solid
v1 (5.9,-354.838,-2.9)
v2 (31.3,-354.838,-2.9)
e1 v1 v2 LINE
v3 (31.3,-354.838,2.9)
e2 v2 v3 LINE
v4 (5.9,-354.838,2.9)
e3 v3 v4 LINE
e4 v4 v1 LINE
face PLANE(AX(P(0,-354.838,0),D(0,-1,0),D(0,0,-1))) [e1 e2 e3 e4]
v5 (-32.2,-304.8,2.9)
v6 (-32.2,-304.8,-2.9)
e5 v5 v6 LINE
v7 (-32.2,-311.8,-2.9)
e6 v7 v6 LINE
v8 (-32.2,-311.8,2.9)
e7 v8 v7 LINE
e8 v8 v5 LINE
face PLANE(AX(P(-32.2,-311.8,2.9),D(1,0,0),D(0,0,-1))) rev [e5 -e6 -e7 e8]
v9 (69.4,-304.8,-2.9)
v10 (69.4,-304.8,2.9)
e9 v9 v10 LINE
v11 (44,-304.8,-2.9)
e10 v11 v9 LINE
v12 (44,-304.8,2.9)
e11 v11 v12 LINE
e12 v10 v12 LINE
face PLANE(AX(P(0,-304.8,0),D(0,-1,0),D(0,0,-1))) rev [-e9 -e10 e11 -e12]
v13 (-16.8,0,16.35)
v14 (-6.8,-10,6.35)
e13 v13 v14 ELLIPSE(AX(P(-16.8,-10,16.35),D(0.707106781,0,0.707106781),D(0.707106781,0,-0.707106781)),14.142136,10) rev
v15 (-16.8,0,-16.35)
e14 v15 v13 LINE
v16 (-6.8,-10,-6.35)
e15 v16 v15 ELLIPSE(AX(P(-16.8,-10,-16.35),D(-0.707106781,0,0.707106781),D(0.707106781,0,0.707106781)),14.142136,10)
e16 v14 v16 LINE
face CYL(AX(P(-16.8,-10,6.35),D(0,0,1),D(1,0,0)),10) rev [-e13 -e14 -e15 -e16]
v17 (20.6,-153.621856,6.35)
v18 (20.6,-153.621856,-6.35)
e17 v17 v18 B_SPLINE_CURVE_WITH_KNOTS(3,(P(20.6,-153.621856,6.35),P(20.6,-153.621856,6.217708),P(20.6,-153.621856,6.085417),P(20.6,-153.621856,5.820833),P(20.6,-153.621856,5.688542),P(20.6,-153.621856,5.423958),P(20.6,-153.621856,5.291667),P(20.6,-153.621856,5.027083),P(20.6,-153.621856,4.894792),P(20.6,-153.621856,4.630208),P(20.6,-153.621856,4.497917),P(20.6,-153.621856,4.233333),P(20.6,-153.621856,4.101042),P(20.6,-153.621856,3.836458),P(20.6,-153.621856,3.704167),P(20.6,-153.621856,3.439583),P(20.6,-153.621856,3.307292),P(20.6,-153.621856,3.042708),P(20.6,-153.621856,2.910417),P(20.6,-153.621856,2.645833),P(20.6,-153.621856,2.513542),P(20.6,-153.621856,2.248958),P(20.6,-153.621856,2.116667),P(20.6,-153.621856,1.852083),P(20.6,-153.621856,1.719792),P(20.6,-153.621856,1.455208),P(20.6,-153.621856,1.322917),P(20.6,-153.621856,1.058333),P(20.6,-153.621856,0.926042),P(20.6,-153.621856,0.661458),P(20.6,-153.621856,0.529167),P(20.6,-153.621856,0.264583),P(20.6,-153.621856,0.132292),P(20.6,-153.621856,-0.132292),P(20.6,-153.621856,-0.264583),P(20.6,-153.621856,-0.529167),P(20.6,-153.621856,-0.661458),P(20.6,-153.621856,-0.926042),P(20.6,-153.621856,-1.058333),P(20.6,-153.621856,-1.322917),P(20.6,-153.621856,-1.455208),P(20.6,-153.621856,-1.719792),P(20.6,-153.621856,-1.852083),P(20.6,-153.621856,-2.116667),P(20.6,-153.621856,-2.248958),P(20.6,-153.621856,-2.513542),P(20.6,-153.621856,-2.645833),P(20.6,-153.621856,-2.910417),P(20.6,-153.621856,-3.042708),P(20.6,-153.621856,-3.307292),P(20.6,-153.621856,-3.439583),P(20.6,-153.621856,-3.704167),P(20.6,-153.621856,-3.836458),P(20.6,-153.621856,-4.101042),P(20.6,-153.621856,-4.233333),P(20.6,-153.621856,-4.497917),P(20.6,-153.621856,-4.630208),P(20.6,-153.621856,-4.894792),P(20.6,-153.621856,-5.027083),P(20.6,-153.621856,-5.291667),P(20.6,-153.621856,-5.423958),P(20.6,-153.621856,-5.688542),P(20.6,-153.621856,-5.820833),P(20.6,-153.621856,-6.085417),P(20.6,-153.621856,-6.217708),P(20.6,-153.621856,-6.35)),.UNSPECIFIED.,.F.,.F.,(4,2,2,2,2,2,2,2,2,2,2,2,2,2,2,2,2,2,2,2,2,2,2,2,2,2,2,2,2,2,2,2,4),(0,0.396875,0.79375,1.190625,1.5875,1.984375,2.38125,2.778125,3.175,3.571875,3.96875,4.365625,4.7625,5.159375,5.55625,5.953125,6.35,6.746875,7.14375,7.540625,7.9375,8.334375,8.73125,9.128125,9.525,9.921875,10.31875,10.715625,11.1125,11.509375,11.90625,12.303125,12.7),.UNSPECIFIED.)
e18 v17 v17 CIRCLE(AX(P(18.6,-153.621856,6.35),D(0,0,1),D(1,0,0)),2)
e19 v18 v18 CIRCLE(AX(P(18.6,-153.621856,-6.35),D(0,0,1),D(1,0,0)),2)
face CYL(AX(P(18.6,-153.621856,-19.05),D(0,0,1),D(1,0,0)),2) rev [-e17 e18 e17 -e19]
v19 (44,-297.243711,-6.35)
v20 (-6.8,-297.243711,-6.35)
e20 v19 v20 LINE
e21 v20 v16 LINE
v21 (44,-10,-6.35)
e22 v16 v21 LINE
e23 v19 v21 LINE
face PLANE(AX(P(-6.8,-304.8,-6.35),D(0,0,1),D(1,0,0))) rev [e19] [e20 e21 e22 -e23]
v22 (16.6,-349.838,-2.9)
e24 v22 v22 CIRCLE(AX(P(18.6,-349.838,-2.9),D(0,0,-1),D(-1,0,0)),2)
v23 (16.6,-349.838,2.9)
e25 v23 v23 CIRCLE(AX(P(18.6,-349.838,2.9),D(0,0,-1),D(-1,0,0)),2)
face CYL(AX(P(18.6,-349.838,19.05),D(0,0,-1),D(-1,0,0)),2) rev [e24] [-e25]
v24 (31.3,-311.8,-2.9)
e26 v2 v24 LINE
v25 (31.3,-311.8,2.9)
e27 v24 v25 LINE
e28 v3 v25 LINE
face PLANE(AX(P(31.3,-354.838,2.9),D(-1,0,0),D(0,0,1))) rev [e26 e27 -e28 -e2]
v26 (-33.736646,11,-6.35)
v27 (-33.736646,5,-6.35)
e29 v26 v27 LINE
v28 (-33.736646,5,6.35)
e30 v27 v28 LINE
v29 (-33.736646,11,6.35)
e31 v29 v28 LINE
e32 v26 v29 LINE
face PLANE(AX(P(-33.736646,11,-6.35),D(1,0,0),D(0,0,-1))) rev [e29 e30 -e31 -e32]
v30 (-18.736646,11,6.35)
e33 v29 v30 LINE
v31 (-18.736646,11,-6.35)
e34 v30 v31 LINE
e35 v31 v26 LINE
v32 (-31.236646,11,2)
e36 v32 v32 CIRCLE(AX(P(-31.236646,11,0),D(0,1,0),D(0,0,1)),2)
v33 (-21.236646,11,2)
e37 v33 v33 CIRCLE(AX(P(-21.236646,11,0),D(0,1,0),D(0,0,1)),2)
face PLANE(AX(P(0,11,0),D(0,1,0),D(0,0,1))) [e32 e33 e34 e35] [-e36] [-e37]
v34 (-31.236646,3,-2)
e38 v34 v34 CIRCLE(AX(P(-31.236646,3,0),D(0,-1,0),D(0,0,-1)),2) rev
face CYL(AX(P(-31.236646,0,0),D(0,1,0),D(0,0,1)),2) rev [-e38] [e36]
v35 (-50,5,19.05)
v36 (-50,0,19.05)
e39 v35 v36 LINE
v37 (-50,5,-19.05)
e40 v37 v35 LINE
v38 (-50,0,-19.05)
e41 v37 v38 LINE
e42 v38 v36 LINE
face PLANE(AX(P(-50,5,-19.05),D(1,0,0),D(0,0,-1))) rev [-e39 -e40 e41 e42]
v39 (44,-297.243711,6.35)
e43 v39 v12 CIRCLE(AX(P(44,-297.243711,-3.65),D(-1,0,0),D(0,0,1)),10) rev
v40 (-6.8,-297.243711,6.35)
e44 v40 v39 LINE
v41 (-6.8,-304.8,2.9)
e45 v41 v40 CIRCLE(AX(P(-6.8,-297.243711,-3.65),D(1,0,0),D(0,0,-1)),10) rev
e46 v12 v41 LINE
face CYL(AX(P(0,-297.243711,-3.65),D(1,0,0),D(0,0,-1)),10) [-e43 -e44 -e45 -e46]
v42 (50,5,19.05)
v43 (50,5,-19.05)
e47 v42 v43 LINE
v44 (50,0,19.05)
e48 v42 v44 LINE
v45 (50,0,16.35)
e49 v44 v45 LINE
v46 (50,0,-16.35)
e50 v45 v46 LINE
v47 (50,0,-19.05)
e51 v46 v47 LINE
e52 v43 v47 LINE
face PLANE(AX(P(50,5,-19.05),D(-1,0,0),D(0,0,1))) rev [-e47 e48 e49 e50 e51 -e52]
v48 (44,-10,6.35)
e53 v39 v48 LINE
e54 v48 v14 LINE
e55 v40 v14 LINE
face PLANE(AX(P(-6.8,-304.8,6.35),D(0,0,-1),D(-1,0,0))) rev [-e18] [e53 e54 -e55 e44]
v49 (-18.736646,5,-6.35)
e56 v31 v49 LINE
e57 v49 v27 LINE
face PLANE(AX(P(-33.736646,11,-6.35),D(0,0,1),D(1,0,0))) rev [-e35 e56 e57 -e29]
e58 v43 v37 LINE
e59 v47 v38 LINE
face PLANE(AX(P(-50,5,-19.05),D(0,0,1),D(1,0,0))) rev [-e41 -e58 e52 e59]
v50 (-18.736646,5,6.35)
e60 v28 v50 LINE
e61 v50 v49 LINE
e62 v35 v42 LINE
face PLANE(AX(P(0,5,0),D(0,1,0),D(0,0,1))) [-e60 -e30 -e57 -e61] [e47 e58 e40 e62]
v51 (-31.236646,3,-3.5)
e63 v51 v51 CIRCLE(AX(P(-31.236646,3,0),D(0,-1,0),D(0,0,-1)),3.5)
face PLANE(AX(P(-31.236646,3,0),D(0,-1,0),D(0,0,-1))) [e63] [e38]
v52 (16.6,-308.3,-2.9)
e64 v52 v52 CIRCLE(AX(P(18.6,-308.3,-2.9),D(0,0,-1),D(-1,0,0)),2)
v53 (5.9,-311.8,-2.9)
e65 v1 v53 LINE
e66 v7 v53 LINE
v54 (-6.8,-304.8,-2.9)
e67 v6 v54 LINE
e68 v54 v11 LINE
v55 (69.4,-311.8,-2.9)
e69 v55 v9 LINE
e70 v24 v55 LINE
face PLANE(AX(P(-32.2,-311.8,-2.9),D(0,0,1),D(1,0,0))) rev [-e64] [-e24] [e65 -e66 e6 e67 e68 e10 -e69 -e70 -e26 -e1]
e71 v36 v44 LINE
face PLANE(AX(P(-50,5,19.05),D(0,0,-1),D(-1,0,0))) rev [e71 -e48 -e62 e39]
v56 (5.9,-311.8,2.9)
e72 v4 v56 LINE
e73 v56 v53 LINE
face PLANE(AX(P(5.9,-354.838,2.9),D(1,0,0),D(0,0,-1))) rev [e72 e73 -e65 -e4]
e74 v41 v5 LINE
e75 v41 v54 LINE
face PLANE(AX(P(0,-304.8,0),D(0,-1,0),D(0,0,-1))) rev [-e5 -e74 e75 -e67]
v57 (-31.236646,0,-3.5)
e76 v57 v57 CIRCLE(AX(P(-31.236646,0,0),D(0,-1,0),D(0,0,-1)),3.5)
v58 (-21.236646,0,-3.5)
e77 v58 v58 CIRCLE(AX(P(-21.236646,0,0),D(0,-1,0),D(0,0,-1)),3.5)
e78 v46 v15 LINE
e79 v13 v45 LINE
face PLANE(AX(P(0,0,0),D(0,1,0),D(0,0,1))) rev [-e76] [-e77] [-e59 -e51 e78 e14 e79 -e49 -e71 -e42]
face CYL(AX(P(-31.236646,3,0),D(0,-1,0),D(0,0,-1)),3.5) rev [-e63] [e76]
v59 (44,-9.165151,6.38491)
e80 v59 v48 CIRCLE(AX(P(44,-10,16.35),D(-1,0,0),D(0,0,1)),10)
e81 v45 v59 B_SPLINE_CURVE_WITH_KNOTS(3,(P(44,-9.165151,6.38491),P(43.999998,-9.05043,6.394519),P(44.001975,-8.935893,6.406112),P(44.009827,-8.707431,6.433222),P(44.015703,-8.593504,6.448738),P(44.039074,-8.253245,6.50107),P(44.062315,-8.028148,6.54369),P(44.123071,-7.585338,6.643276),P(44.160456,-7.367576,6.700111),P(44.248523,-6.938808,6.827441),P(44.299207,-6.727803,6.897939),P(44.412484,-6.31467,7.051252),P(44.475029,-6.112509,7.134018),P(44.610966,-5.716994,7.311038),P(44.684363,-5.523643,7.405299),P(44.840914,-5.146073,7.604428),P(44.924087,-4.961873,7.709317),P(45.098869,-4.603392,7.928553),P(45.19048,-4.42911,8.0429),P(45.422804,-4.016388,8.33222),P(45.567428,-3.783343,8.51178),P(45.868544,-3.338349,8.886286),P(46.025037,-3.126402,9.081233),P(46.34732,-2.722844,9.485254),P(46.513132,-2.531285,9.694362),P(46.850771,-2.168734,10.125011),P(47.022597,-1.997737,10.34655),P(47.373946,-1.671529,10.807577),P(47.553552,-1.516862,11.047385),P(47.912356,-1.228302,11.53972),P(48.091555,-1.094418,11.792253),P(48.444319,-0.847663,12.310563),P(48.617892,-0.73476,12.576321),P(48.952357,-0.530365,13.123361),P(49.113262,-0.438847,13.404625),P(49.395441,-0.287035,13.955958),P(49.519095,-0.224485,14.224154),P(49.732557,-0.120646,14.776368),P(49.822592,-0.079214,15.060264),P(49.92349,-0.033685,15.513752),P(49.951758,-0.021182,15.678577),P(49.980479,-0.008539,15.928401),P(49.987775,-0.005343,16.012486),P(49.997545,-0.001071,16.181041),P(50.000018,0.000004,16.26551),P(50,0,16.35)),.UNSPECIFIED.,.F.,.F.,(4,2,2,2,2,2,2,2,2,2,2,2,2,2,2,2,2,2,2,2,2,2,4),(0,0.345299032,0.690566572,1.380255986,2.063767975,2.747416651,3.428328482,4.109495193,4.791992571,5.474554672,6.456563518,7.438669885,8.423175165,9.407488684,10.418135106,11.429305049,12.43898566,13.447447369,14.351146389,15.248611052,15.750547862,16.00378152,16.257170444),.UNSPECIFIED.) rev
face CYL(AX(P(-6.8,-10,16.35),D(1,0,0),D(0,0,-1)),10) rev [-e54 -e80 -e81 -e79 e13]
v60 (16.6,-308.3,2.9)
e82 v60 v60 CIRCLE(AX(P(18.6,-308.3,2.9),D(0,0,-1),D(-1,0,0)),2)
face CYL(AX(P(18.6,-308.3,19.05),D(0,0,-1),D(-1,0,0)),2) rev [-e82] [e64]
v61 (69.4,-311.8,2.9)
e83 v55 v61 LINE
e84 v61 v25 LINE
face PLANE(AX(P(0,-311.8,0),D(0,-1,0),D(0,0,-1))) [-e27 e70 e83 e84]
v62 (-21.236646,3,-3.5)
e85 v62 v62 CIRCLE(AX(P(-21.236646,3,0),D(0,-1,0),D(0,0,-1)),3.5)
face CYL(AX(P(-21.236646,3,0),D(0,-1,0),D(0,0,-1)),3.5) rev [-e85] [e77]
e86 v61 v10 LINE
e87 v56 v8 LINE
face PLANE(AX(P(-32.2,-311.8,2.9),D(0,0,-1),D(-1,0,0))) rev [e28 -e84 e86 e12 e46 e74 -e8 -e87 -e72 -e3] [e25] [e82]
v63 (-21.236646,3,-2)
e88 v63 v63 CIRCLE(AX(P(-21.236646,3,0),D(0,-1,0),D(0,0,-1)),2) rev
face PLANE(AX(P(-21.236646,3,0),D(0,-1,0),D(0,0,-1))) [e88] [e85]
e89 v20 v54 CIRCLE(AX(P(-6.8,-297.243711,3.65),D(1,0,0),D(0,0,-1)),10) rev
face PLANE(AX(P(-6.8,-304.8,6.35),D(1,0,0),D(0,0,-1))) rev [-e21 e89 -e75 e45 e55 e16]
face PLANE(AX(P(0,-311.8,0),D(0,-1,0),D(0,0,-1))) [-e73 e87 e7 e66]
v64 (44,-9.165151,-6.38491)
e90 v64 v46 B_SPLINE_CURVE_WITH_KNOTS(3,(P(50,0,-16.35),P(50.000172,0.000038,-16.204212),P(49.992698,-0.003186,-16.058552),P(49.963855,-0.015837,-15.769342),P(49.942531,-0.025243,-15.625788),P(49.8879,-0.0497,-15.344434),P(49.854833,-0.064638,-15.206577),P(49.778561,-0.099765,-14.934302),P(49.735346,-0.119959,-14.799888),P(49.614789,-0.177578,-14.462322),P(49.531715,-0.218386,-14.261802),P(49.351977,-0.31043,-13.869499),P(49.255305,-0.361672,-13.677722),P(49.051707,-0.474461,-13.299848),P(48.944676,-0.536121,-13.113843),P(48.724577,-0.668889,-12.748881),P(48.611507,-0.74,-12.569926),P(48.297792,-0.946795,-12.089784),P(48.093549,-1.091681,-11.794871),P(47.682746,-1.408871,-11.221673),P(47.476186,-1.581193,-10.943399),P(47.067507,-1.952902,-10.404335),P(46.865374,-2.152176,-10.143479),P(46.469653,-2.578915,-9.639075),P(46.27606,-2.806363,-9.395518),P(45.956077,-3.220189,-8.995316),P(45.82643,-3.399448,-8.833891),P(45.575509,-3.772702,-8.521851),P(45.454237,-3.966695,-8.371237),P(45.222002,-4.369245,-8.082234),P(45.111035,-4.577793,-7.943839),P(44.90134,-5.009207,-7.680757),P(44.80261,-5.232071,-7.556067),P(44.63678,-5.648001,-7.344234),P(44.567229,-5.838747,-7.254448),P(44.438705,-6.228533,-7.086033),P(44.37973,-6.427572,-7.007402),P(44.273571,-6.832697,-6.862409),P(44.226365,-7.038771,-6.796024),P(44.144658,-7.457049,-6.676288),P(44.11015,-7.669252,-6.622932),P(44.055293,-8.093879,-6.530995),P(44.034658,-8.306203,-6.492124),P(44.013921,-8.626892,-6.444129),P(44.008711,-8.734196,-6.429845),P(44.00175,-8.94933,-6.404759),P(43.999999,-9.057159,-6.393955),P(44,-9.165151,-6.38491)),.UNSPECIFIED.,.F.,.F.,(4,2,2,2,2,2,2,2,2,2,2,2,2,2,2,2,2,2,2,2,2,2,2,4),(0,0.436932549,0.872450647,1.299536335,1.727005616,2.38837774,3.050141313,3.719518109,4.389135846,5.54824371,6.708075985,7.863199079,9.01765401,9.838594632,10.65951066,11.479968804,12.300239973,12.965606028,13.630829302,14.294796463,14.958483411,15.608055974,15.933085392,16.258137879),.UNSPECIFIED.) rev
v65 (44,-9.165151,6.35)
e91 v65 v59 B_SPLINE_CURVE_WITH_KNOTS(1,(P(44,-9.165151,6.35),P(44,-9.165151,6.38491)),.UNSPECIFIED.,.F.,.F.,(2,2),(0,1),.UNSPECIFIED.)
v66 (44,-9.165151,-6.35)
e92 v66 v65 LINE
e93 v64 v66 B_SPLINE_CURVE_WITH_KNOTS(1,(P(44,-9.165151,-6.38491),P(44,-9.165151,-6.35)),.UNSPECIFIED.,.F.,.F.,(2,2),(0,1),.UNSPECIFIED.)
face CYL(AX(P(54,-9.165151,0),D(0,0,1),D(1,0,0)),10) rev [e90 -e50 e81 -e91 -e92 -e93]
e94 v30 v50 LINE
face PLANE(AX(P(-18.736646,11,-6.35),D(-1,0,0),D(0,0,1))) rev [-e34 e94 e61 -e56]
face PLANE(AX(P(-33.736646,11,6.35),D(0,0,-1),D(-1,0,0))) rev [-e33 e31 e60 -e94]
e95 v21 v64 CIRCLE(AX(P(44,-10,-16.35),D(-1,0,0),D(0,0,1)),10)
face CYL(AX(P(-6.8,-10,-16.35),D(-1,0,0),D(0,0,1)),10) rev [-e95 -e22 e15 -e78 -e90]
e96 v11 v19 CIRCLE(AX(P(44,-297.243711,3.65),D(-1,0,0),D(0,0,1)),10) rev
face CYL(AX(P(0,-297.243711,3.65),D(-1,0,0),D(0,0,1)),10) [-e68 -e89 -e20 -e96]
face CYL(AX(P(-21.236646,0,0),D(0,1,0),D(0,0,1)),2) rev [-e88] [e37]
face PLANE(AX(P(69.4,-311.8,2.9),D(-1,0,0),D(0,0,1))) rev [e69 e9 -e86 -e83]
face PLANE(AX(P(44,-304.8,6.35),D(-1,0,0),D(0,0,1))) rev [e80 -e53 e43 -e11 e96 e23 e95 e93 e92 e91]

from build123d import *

# Parameters (mm, degrees)
BOSS_EXTRUDE1_DEPTH         = 5
BOSS_EXTRUDE2_DEPTH         = 6
TAP_DRILL_FOR_M4X0_7_TAP1_D = 3.3
SKETCH3_R                   = 2.000000000000003
CUT_EXTRUDE1_DEPTH          = 55.62510869554404
SKETCH12_R                  = 3.5
CUT_EXTRUDE2_DEPTH          = 3
BOSS_EXTRUDE3_DEPTH         = 304.8
SKETCH14_W                  = 101.6
SKETCH14_H                  = 5.799999999999999
BOSS_EXTRUDE4_DEPTH         = 7
FILLET1_R                   = 10
FILLET2_R                   = 10
FILLET3_R                   = 10
SKETCH15_R                  = 2.0000000000000036
CUT_EXTRUDE3_DEPTH          = 321.1833888570736
SKETCH16_W                  = 25.400000000000002
SKETCH16_H                  = 5.799999999999999
BOSS_EXTRUDE5_DEPTH         = 43.038
SKETCH17_R                  = 2.0000000000000036
CUT_EXTRUDE4_DEPTH          = 363.22668143581035
SKETCH18_R                  = 2.0000000000000036
CUT_EXTRUDE5_DEPTH          = 363.4521019996987


with BuildPart() as part:
    # Sketch1 → Boss-Extrude1 (new body)
    with BuildSketch(Plane(origin=(0, 0, 0), x_dir=(1, 0, 0), z_dir=(0, 1, 0))):
        Polygon((-49.99999999999999, 19.050000000000004), (50.00000000000001, 19.050000000000004), (50.000000000000014, -19.049999999999997), (-49.99999999999999, -19.049999999999997), align=None)
    extrude(amount=BOSS_EXTRUDE1_DEPTH)

    # Sketch2 → Boss-Extrude2 (add)
    with BuildSketch(Plane(origin=(0, 5, 0), x_dir=(1, 0, 0), z_dir=(0, 1, 0))):
        Polygon((-33.73664574389268, 6.349999999999993), (-18.736645743892684, 6.349999999999995), (-18.73664574389268, -6.350000000000003), (-33.73664574389268, -6.350000000000006), align=None)
    extrude(amount=BOSS_EXTRUDE2_DEPTH)

    # Tap Drill for M4x0.7 Tap1 (through all)
    with Locations(Plane(origin=(0, 11, 0), x_dir=(1, 0, 0), z_dir=(0, 1, 0))):
        with Locations((-31.236645744, 0), (-21.236645744, 0)):
            Hole(TAP_DRILL_FOR_M4X0_7_TAP1_D / 2)

    # Sketch3 → Cut-Extrude1 (cut, through all)
    with BuildSketch(Plane(origin=(0, 11, 0), x_dir=(1, 0, 0), z_dir=(0, 1, 0))):
        with Locations(Location((-21.236645743892684, 0, 0), (0, 0, 270))):
            Circle(SKETCH3_R)
        with Locations(Location((-31.23664574389268, 0, 0), (0, 0, 270))):
            Circle(SKETCH3_R)
    extrude(amount=-CUT_EXTRUDE1_DEPTH, mode=Mode.SUBTRACT)

    # Sketch12 → Cut-Extrude2 (cut)
    with BuildSketch(Plane.XZ):
        with Locations(Location((-31.23664574389268, 0, 0), (0, 0, 270))):
            Circle(SKETCH12_R)
        with Locations(Location((-21.236645743892684, 0, 0), (0, 0, 270))):
            Circle(SKETCH12_R)
    extrude(amount=-CUT_EXTRUDE2_DEPTH, mode=Mode.SUBTRACT)

    # Sketch13 → Boss-Extrude3 (add)
    with BuildSketch(Plane.XZ):
        Polygon((-6.799999999999993, 6.349999999999998), (44.00000000000001, 6.349999999999998), (44.00000000000001, -6.350000000000001), (-6.799999999999991, -6.350000000000001), align=None)
    extrude(amount=BOSS_EXTRUDE3_DEPTH)

    # Sketch14 → Boss-Extrude4 (add)
    with BuildSketch(Plane.XZ.offset(304.8)):
        with Locations((18.600000000000005, 2.89e-15)):
            Rectangle(SKETCH14_W, SKETCH14_H)
    extrude(amount=BOSS_EXTRUDE4_DEPTH)

    # Fillet1
    # the kernel refuses this fillet: 10 mm, written as the material it takes off along each edge
    with BuildSketch(Plane(origin=(62.89072192903172, -304.8, -6.350000000000001), x_dir=(0, 1, 0), z_dir=(-1, 0, 0))) as fillet1_piece_1:
        with BuildLine():
            CenterArc((7.556288771612685, -10), FILLET1_R, 90, 49.08035004511348)
            Line((0, -3.450000000000001), (-0.1511257754322628, -3.3190000000000013))
            ThreePointArc((-0.1511257754322628, -3.3190000000000013), (-0.19999999999998863, -1.7250000000000005), (-0.19999999999998863, 0))
            Line((-0.19999999999998863, 0), (0, 0.20000000000000018))
            Line((0, 0.20000000000000018), (7.556288771612685, 0.20000000000000018))
            Line((7.556288771612685, 0.20000000000000018), (7.556288771612685, 0))
        make_face()
    extrude(amount=88.58144385806342, mode=Mode.SUBTRACT)

    # Fillet2
    # the kernel refuses this fillet: 10 mm, written as the material it takes off along each edge
    with BuildSketch(Plane(origin=(-25.690721929031707, -304.8, 6.349999999999998), x_dir=(0, 1, 0), z_dir=(1, 0, 0))) as fillet2_piece_1:
        with BuildLine():
            CenterArc((7.556288771612685, -10), FILLET2_R, 90, 49.08035004511345)
            Line((0, -3.4499999999999957), (-0.1511257754322628, -3.3189999999999955))
            ThreePointArc((-0.1511257754322628, -3.3189999999999955), (-0.19999999999998863, -1.7249999999999979), (-0.19999999999998863, 0))
            Line((-0.19999999999998863, 0), (0, 0.20000000000000018))
            Line((0, 0.20000000000000018), (7.556288771612685, 0.20000000000000018))
            Line((7.556288771612685, 0.20000000000000018), (7.556288771612685, 0))
        make_face()
    extrude(amount=88.58144385806342, mode=Mode.SUBTRACT)

    # Fillet3
    # the kernel refuses this fillet: 10 mm, written as the material it adds along each edge
    with BuildSketch(Plane(origin=(44.00000000000001, 0, 6.349999999999998), x_dir=(1, 0, 0), z_dir=(0, 0, -1))) as fillet3_piece_1:
        with BuildLine():
            CenterArc((10, 9.165151389911683), FILLET3_R, 180, 66.42182152179822)
            Line((0, 9.165151389911683), (-0.20000000000000284, 9.165151389911683))
            Line((-0.20000000000000284, 9.165151389911683), (-0.20000000000000284, 0))
            Line((-0.20000000000000284, 0), (0, -0.2))
            ThreePointArc((0, -0.2), (3.000000000000007, -0.2), (5.920000000000009, -0.18330302779823368))
            Line((5.920000000000009, -0.18330302779823368), (6.000000000000007, 0))
        make_face()
    extrude(amount=12.7)
    with BuildSketch(Plane(origin=(-6.799999999999993, 0, 6.349999999999998), x_dir=(0, 0, 1), z_dir=(1, 0, 0))) as fillet3_piece_2:
        with BuildLine():
            CenterArc((FILLET3_R, FILLET3_R), FILLET3_R, 180, 90)
            Line((-3.55e-15, FILLET3_R), (-FILLET3_R * 0.02, FILLET3_R))
            Line((-FILLET3_R * 0.02, FILLET3_R), (-FILLET3_R * 0.02, -FILLET3_R * 0.02))
            Line((-FILLET3_R * 0.02, -FILLET3_R * 0.02), (FILLET3_R, -FILLET3_R * 0.02))
            Line((FILLET3_R, -FILLET3_R * 0.02), (FILLET3_R, 0))
        make_face()
    extrude(amount=50.8)
    with BuildSketch(Plane(origin=(-6.799999999999991, 0, -6.350000000000001), x_dir=(-1, 0, -1.4e-16), z_dir=(-1.4e-16, 0, 1))) as fillet3_piece_3:
        with BuildLine():
            CenterArc((FILLET3_R, FILLET3_R), FILLET3_R, 180, 90)
            Line((-8.9e-16, FILLET3_R), (-FILLET3_R * 0.02, FILLET3_R))
            Line((-FILLET3_R * 0.02, FILLET3_R), (-FILLET3_R * 0.02, -FILLET3_R * 0.02))
            Line((-FILLET3_R * 0.02, -FILLET3_R * 0.02), (FILLET3_R, -FILLET3_R * 0.02))
            Line((FILLET3_R, -FILLET3_R * 0.02), (FILLET3_R, 0))
        make_face()
    extrude(amount=12.7)
    with BuildSketch(Plane(origin=(44.00000000000001, 0, -6.350000000000001), x_dir=(0, 0, -1), z_dir=(-1, 0, 0))) as fillet3_piece_4:
        with BuildLine():
            CenterArc((FILLET3_R, FILLET3_R), FILLET3_R, 180, 90)
            Line((0, FILLET3_R), (-FILLET3_R * 0.02, FILLET3_R))
            Line((-FILLET3_R * 0.02, FILLET3_R), (-FILLET3_R * 0.02, -FILLET3_R * 0.02))
            Line((-FILLET3_R * 0.02, -FILLET3_R * 0.02), (FILLET3_R, -FILLET3_R * 0.02))
            Line((FILLET3_R, -FILLET3_R * 0.02), (FILLET3_R, 0))
        make_face()
    extrude(amount=50.8)
    with BuildSketch(Plane(origin=(44.00000000000001, 0, 29.262878474779207), x_dir=(1, 0, 0), z_dir=(0, 0, -1))) as fillet3_piece_5a_section:
        with BuildLine():
            CenterArc((10, 9.165151389911683), FILLET3_R, 180, 66.42182152179822)
            Line((0, 9.165151389911683), (-0.20000000000000284, 9.165151389911683))
            Line((-0.20000000000000284, 9.165151389911683), (-0.20000000000000284, 0))
            Line((-0.20000000000000284, 0), (0, -0.2))
            ThreePointArc((0, -0.2), (3.000000000000007, -0.2), (5.920000000000009, -0.18330302779823368))
            Line((5.920000000000009, -0.18330302779823368), (6.000000000000007, 0))
        make_face()
    fillet3_piece_5a = extrude(amount=35.61287847477921, mode=Mode.PRIVATE)
    fillet3_piece_5a = split(fillet3_piece_5a, bisect_by=Plane(origin=(45.551632877410285, -2.2318754420498643, 19.049999999999997), z_dir=(0, 0, -1)), keep=Keep.TOP, mode=Mode.PRIVATE)
    fillet3_piece_5a = split(fillet3_piece_5a, bisect_by=Plane(origin=(45.551632877410285, -2.2318754420498643, 6.349999999999998), z_dir=(0, 0, 1)), keep=Keep.TOP, mode=Mode.PRIVATE)
    with BuildSketch(Plane(origin=(-6.799999999999993, 0, 6.349999999999998), x_dir=(0, 0, 1), z_dir=(1, 0, 0))) as fillet3_piece_5b_section:
        with BuildLine():
            CenterArc((FILLET3_R, FILLET3_R), FILLET3_R, 180, 90)
            Line((-3.55e-15, FILLET3_R), (-FILLET3_R * 0.02, FILLET3_R))
            Line((-FILLET3_R * 0.02, FILLET3_R), (-FILLET3_R * 0.02, -FILLET3_R * 0.02))
            Line((-FILLET3_R * 0.02, -FILLET3_R * 0.02), (FILLET3_R, -FILLET3_R * 0.02))
            Line((FILLET3_R, -FILLET3_R * 0.02), (FILLET3_R, 0))
        make_face()
    fillet3_piece_5b = extrude(amount=75.8, mode=Mode.PRIVATE)
    fillet3_piece_5b = split(fillet3_piece_5b, bisect_by=Plane(origin=(50.000000000000014, -2.2639511426682537, 8.613951142668249), z_dir=(-1, 0, 1.9e-16)), keep=Keep.TOP, mode=Mode.PRIVATE)
    fillet3_piece_5b = split(fillet3_piece_5b, bisect_by=Plane(origin=(44.00000000000001, -2.2639511426682537, 8.613951142668249), z_dir=(1, 0, 0)), keep=Keep.TOP, mode=Mode.PRIVATE)
    fillet3_piece_5 = fillet3_piece_5a & fillet3_piece_5b
    add(fillet3_piece_5)
    with BuildSketch(Plane(origin=(69, 0, -6.350000000000001), x_dir=(0, 0, -1), z_dir=(-1, 0, 0))) as fillet3_piece_6a_section:
        with BuildLine():
            CenterArc((FILLET3_R, FILLET3_R), FILLET3_R, 180, 90)
            Line((0, FILLET3_R), (-FILLET3_R * 0.02, FILLET3_R))
            Line((-FILLET3_R * 0.02, FILLET3_R), (-FILLET3_R * 0.02, -FILLET3_R * 0.02))
            Line((-FILLET3_R * 0.02, -FILLET3_R * 0.02), (FILLET3_R, -FILLET3_R * 0.02))
            Line((FILLET3_R, -FILLET3_R * 0.02), (FILLET3_R, 0))
        make_face()
    fillet3_piece_6a = extrude(amount=75.79999999999998, mode=Mode.PRIVATE)
    fillet3_piece_6a = split(fillet3_piece_6a, bisect_by=Plane(origin=(50.00000000000001, -2.2639511426682555, -8.613951142668254), z_dir=(-1, 0, 1.9e-16)), keep=Keep.TOP, mode=Mode.PRIVATE)
    fillet3_piece_6a = split(fillet3_piece_6a, bisect_by=Plane(origin=(44.00000000000001, -2.2639511426682555, -8.613951142668252), z_dir=(1, 0, 0)), keep=Keep.TOP, mode=Mode.PRIVATE)
    with BuildSketch(Plane(origin=(44.00000000000001, 0, 6.349999999999998), x_dir=(1, 0, 0), z_dir=(0, 0, -1))) as fillet3_piece_6b_section:
        with BuildLine():
            CenterArc((10, 9.165151389911683), FILLET3_R, 180, 66.42182152179822)
            Line((0, 9.165151389911683), (-0.20000000000000284, 9.165151389911683))
            Line((-0.20000000000000284, 9.165151389911683), (-0.20000000000000284, 0))
            Line((-0.20000000000000284, 0), (0, -0.2))
            ThreePointArc((0, -0.2), (3.000000000000007, -0.2), (5.920000000000009, -0.18330302779823368))
            Line((5.920000000000009, -0.18330302779823368), (6.000000000000007, 0))
        make_face()
    fillet3_piece_6b = extrude(amount=35.61287847477921, mode=Mode.PRIVATE)
    fillet3_piece_6b = split(fillet3_piece_6b, bisect_by=Plane(origin=(45.55163287741028, -2.2318754420498657, -19.050000000000004), z_dir=(0, 0, 1)), keep=Keep.TOP, mode=Mode.PRIVATE)
    fillet3_piece_6b = split(fillet3_piece_6b, bisect_by=Plane(origin=(45.551632877410285, -2.2318754420498657, -6.350000000000001), z_dir=(0, 0, -1)), keep=Keep.TOP, mode=Mode.PRIVATE)
    fillet3_piece_6 = fillet3_piece_6a & fillet3_piece_6b
    add(fillet3_piece_6)
    with BuildSketch(Plane(origin=(-6.799999999999991, 0, -6.350000000000001), x_dir=(-1, 0, -1.4e-16), z_dir=(-1.4e-16, 0, 1))) as fillet3_piece_7a_section:
        with BuildLine():
            CenterArc((FILLET3_R, FILLET3_R), FILLET3_R, 180, 90)
            Line((-8.9e-16, FILLET3_R), (-FILLET3_R * 0.02, FILLET3_R))
            Line((-FILLET3_R * 0.02, FILLET3_R), (-FILLET3_R * 0.02, -FILLET3_R * 0.02))
            Line((-FILLET3_R * 0.02, -FILLET3_R * 0.02), (FILLET3_R, -FILLET3_R * 0.02))
            Line((FILLET3_R, -FILLET3_R * 0.02), (FILLET3_R, 0))
        make_face()
    fillet3_piece_7a = extrude(amount=37.699999999999996, mode=Mode.PRIVATE)
    fillet3_piece_7a = split(fillet3_piece_7a, bisect_by=Plane(origin=(-9.063951142668245, -2.2639511426682555, 19.049999999999997), z_dir=(0, 0, -1)), keep=Keep.TOP, mode=Mode.PRIVATE)
    fillet3_piece_7a = split(fillet3_piece_7a, bisect_by=Plane(origin=(-9.063951142668246, -2.2639511426682555, 6.349999999999998), z_dir=(0, 0, 1)), keep=Keep.TOP, mode=Mode.PRIVATE)
    with BuildSketch(Plane(origin=(-31.79999999999999, 0, 6.349999999999998), x_dir=(0, 0, 1), z_dir=(1, 0, 0))) as fillet3_piece_7b_section:
        with BuildLine():
            CenterArc((FILLET3_R, FILLET3_R), FILLET3_R, 180, 90)
            Line((-3.55e-15, FILLET3_R), (-FILLET3_R * 0.02, FILLET3_R))
            Line((-FILLET3_R * 0.02, FILLET3_R), (-FILLET3_R * 0.02, -FILLET3_R * 0.02))
            Line((-FILLET3_R * 0.02, -FILLET3_R * 0.02), (FILLET3_R, -FILLET3_R * 0.02))
            Line((FILLET3_R, -FILLET3_R * 0.02), (FILLET3_R, 0))
        make_face()
    fillet3_piece_7b = extrude(amount=75.8, mode=Mode.PRIVATE)
    fillet3_piece_7b = split(fillet3_piece_7b, bisect_by=Plane(origin=(-6.799999999999993, -2.263951142668253, 8.613951142668249), z_dir=(-1, 0, -1.4e-16)), keep=Keep.TOP, mode=Mode.PRIVATE)
    fillet3_piece_7 = fillet3_piece_7a & fillet3_piece_7b
    add(fillet3_piece_7)
    with BuildSketch(Plane(origin=(-6.799999999999987, 0, -31.349999999999998), x_dir=(-1, 0, -1.4e-16), z_dir=(-1.4e-16, 0, 1))) as fillet3_piece_8a_section:
        with BuildLine():
            CenterArc((FILLET3_R, FILLET3_R), FILLET3_R, 180, 90)
            Line((-8.9e-16, FILLET3_R), (-FILLET3_R * 0.02, FILLET3_R))
            Line((-FILLET3_R * 0.02, FILLET3_R), (-FILLET3_R * 0.02, -FILLET3_R * 0.02))
            Line((-FILLET3_R * 0.02, -FILLET3_R * 0.02), (FILLET3_R, -FILLET3_R * 0.02))
            Line((FILLET3_R, -FILLET3_R * 0.02), (FILLET3_R, 0))
        make_face()
    fillet3_piece_8a = extrude(amount=37.699999999999996, mode=Mode.PRIVATE)
    fillet3_piece_8a = split(fillet3_piece_8a, bisect_by=Plane(origin=(-9.063951142668245, -2.2639511426682524, -19.050000000000004), z_dir=(0, 0, 1)), keep=Keep.TOP, mode=Mode.PRIVATE)
    fillet3_piece_8a = split(fillet3_piece_8a, bisect_by=Plane(origin=(-9.063951142668245, -2.2639511426682524, -6.350000000000001), z_dir=(0, 0, -1)), keep=Keep.TOP, mode=Mode.PRIVATE)
    with BuildSketch(Plane(origin=(44.00000000000001, 0, -6.350000000000001), x_dir=(0, 0, -1), z_dir=(-1, 0, 0))) as fillet3_piece_8b_section:
        with BuildLine():
            CenterArc((FILLET3_R, FILLET3_R), FILLET3_R, 180, 90)
            Line((0, FILLET3_R), (-FILLET3_R * 0.02, FILLET3_R))
            Line((-FILLET3_R * 0.02, FILLET3_R), (-FILLET3_R * 0.02, -FILLET3_R * 0.02))
            Line((-FILLET3_R * 0.02, -FILLET3_R * 0.02), (FILLET3_R, -FILLET3_R * 0.02))
            Line((FILLET3_R, -FILLET3_R * 0.02), (FILLET3_R, 0))
        make_face()
    fillet3_piece_8b = extrude(amount=75.8, mode=Mode.PRIVATE)
    fillet3_piece_8b = split(fillet3_piece_8b, bisect_by=Plane(origin=(-6.799999999999991, -2.263951142668254, -8.613951142668252), z_dir=(-1, 0, -1.4e-16)), keep=Keep.TOP, mode=Mode.PRIVATE)
    fillet3_piece_8 = fillet3_piece_8a & fillet3_piece_8b
    add(fillet3_piece_8)

    # Sketch15 → Cut-Extrude3 (cut, through all)
    with BuildSketch(Plane(origin=(0, 0, -2.8999999999999972), x_dir=(-1, 0, 0), z_dir=(0, 0, -1))):
        with Locations((-18.60000000000002, -308.3)):
            Circle(SKETCH15_R)
    extrude(amount=-CUT_EXTRUDE3_DEPTH, mode=Mode.SUBTRACT)

    # Sketch16 → Boss-Extrude5 (add)
    with BuildSketch(Plane.XZ.offset(311.8)):
        with Locations((18.60000000000001, 2.89e-15)):
            Rectangle(SKETCH16_W, SKETCH16_H)
    extrude(amount=BOSS_EXTRUDE5_DEPTH)

    # Sketch17 → Cut-Extrude4 (cut, through all)
    with BuildSketch(Plane(origin=(0, 0, -2.8999999999999972), x_dir=(-1, 0, 0), z_dir=(0, 0, -1))):
        with Locations((-18.599999999999998, -349.838)):
            Circle(SKETCH17_R)
    extrude(amount=-CUT_EXTRUDE4_DEPTH, mode=Mode.SUBTRACT)

    # Sketch18 → Cut-Extrude5 (cut, through all)
    with BuildSketch(Plane.XY.offset(6.349999999999998)):
        with Locations((18.599999999999977, -153.62185561419372)):
            Circle(SKETCH18_R)
    extrude(amount=-CUT_EXTRUDE5_DEPTH, mode=Mode.SUBTRACT)


solid = part.part
